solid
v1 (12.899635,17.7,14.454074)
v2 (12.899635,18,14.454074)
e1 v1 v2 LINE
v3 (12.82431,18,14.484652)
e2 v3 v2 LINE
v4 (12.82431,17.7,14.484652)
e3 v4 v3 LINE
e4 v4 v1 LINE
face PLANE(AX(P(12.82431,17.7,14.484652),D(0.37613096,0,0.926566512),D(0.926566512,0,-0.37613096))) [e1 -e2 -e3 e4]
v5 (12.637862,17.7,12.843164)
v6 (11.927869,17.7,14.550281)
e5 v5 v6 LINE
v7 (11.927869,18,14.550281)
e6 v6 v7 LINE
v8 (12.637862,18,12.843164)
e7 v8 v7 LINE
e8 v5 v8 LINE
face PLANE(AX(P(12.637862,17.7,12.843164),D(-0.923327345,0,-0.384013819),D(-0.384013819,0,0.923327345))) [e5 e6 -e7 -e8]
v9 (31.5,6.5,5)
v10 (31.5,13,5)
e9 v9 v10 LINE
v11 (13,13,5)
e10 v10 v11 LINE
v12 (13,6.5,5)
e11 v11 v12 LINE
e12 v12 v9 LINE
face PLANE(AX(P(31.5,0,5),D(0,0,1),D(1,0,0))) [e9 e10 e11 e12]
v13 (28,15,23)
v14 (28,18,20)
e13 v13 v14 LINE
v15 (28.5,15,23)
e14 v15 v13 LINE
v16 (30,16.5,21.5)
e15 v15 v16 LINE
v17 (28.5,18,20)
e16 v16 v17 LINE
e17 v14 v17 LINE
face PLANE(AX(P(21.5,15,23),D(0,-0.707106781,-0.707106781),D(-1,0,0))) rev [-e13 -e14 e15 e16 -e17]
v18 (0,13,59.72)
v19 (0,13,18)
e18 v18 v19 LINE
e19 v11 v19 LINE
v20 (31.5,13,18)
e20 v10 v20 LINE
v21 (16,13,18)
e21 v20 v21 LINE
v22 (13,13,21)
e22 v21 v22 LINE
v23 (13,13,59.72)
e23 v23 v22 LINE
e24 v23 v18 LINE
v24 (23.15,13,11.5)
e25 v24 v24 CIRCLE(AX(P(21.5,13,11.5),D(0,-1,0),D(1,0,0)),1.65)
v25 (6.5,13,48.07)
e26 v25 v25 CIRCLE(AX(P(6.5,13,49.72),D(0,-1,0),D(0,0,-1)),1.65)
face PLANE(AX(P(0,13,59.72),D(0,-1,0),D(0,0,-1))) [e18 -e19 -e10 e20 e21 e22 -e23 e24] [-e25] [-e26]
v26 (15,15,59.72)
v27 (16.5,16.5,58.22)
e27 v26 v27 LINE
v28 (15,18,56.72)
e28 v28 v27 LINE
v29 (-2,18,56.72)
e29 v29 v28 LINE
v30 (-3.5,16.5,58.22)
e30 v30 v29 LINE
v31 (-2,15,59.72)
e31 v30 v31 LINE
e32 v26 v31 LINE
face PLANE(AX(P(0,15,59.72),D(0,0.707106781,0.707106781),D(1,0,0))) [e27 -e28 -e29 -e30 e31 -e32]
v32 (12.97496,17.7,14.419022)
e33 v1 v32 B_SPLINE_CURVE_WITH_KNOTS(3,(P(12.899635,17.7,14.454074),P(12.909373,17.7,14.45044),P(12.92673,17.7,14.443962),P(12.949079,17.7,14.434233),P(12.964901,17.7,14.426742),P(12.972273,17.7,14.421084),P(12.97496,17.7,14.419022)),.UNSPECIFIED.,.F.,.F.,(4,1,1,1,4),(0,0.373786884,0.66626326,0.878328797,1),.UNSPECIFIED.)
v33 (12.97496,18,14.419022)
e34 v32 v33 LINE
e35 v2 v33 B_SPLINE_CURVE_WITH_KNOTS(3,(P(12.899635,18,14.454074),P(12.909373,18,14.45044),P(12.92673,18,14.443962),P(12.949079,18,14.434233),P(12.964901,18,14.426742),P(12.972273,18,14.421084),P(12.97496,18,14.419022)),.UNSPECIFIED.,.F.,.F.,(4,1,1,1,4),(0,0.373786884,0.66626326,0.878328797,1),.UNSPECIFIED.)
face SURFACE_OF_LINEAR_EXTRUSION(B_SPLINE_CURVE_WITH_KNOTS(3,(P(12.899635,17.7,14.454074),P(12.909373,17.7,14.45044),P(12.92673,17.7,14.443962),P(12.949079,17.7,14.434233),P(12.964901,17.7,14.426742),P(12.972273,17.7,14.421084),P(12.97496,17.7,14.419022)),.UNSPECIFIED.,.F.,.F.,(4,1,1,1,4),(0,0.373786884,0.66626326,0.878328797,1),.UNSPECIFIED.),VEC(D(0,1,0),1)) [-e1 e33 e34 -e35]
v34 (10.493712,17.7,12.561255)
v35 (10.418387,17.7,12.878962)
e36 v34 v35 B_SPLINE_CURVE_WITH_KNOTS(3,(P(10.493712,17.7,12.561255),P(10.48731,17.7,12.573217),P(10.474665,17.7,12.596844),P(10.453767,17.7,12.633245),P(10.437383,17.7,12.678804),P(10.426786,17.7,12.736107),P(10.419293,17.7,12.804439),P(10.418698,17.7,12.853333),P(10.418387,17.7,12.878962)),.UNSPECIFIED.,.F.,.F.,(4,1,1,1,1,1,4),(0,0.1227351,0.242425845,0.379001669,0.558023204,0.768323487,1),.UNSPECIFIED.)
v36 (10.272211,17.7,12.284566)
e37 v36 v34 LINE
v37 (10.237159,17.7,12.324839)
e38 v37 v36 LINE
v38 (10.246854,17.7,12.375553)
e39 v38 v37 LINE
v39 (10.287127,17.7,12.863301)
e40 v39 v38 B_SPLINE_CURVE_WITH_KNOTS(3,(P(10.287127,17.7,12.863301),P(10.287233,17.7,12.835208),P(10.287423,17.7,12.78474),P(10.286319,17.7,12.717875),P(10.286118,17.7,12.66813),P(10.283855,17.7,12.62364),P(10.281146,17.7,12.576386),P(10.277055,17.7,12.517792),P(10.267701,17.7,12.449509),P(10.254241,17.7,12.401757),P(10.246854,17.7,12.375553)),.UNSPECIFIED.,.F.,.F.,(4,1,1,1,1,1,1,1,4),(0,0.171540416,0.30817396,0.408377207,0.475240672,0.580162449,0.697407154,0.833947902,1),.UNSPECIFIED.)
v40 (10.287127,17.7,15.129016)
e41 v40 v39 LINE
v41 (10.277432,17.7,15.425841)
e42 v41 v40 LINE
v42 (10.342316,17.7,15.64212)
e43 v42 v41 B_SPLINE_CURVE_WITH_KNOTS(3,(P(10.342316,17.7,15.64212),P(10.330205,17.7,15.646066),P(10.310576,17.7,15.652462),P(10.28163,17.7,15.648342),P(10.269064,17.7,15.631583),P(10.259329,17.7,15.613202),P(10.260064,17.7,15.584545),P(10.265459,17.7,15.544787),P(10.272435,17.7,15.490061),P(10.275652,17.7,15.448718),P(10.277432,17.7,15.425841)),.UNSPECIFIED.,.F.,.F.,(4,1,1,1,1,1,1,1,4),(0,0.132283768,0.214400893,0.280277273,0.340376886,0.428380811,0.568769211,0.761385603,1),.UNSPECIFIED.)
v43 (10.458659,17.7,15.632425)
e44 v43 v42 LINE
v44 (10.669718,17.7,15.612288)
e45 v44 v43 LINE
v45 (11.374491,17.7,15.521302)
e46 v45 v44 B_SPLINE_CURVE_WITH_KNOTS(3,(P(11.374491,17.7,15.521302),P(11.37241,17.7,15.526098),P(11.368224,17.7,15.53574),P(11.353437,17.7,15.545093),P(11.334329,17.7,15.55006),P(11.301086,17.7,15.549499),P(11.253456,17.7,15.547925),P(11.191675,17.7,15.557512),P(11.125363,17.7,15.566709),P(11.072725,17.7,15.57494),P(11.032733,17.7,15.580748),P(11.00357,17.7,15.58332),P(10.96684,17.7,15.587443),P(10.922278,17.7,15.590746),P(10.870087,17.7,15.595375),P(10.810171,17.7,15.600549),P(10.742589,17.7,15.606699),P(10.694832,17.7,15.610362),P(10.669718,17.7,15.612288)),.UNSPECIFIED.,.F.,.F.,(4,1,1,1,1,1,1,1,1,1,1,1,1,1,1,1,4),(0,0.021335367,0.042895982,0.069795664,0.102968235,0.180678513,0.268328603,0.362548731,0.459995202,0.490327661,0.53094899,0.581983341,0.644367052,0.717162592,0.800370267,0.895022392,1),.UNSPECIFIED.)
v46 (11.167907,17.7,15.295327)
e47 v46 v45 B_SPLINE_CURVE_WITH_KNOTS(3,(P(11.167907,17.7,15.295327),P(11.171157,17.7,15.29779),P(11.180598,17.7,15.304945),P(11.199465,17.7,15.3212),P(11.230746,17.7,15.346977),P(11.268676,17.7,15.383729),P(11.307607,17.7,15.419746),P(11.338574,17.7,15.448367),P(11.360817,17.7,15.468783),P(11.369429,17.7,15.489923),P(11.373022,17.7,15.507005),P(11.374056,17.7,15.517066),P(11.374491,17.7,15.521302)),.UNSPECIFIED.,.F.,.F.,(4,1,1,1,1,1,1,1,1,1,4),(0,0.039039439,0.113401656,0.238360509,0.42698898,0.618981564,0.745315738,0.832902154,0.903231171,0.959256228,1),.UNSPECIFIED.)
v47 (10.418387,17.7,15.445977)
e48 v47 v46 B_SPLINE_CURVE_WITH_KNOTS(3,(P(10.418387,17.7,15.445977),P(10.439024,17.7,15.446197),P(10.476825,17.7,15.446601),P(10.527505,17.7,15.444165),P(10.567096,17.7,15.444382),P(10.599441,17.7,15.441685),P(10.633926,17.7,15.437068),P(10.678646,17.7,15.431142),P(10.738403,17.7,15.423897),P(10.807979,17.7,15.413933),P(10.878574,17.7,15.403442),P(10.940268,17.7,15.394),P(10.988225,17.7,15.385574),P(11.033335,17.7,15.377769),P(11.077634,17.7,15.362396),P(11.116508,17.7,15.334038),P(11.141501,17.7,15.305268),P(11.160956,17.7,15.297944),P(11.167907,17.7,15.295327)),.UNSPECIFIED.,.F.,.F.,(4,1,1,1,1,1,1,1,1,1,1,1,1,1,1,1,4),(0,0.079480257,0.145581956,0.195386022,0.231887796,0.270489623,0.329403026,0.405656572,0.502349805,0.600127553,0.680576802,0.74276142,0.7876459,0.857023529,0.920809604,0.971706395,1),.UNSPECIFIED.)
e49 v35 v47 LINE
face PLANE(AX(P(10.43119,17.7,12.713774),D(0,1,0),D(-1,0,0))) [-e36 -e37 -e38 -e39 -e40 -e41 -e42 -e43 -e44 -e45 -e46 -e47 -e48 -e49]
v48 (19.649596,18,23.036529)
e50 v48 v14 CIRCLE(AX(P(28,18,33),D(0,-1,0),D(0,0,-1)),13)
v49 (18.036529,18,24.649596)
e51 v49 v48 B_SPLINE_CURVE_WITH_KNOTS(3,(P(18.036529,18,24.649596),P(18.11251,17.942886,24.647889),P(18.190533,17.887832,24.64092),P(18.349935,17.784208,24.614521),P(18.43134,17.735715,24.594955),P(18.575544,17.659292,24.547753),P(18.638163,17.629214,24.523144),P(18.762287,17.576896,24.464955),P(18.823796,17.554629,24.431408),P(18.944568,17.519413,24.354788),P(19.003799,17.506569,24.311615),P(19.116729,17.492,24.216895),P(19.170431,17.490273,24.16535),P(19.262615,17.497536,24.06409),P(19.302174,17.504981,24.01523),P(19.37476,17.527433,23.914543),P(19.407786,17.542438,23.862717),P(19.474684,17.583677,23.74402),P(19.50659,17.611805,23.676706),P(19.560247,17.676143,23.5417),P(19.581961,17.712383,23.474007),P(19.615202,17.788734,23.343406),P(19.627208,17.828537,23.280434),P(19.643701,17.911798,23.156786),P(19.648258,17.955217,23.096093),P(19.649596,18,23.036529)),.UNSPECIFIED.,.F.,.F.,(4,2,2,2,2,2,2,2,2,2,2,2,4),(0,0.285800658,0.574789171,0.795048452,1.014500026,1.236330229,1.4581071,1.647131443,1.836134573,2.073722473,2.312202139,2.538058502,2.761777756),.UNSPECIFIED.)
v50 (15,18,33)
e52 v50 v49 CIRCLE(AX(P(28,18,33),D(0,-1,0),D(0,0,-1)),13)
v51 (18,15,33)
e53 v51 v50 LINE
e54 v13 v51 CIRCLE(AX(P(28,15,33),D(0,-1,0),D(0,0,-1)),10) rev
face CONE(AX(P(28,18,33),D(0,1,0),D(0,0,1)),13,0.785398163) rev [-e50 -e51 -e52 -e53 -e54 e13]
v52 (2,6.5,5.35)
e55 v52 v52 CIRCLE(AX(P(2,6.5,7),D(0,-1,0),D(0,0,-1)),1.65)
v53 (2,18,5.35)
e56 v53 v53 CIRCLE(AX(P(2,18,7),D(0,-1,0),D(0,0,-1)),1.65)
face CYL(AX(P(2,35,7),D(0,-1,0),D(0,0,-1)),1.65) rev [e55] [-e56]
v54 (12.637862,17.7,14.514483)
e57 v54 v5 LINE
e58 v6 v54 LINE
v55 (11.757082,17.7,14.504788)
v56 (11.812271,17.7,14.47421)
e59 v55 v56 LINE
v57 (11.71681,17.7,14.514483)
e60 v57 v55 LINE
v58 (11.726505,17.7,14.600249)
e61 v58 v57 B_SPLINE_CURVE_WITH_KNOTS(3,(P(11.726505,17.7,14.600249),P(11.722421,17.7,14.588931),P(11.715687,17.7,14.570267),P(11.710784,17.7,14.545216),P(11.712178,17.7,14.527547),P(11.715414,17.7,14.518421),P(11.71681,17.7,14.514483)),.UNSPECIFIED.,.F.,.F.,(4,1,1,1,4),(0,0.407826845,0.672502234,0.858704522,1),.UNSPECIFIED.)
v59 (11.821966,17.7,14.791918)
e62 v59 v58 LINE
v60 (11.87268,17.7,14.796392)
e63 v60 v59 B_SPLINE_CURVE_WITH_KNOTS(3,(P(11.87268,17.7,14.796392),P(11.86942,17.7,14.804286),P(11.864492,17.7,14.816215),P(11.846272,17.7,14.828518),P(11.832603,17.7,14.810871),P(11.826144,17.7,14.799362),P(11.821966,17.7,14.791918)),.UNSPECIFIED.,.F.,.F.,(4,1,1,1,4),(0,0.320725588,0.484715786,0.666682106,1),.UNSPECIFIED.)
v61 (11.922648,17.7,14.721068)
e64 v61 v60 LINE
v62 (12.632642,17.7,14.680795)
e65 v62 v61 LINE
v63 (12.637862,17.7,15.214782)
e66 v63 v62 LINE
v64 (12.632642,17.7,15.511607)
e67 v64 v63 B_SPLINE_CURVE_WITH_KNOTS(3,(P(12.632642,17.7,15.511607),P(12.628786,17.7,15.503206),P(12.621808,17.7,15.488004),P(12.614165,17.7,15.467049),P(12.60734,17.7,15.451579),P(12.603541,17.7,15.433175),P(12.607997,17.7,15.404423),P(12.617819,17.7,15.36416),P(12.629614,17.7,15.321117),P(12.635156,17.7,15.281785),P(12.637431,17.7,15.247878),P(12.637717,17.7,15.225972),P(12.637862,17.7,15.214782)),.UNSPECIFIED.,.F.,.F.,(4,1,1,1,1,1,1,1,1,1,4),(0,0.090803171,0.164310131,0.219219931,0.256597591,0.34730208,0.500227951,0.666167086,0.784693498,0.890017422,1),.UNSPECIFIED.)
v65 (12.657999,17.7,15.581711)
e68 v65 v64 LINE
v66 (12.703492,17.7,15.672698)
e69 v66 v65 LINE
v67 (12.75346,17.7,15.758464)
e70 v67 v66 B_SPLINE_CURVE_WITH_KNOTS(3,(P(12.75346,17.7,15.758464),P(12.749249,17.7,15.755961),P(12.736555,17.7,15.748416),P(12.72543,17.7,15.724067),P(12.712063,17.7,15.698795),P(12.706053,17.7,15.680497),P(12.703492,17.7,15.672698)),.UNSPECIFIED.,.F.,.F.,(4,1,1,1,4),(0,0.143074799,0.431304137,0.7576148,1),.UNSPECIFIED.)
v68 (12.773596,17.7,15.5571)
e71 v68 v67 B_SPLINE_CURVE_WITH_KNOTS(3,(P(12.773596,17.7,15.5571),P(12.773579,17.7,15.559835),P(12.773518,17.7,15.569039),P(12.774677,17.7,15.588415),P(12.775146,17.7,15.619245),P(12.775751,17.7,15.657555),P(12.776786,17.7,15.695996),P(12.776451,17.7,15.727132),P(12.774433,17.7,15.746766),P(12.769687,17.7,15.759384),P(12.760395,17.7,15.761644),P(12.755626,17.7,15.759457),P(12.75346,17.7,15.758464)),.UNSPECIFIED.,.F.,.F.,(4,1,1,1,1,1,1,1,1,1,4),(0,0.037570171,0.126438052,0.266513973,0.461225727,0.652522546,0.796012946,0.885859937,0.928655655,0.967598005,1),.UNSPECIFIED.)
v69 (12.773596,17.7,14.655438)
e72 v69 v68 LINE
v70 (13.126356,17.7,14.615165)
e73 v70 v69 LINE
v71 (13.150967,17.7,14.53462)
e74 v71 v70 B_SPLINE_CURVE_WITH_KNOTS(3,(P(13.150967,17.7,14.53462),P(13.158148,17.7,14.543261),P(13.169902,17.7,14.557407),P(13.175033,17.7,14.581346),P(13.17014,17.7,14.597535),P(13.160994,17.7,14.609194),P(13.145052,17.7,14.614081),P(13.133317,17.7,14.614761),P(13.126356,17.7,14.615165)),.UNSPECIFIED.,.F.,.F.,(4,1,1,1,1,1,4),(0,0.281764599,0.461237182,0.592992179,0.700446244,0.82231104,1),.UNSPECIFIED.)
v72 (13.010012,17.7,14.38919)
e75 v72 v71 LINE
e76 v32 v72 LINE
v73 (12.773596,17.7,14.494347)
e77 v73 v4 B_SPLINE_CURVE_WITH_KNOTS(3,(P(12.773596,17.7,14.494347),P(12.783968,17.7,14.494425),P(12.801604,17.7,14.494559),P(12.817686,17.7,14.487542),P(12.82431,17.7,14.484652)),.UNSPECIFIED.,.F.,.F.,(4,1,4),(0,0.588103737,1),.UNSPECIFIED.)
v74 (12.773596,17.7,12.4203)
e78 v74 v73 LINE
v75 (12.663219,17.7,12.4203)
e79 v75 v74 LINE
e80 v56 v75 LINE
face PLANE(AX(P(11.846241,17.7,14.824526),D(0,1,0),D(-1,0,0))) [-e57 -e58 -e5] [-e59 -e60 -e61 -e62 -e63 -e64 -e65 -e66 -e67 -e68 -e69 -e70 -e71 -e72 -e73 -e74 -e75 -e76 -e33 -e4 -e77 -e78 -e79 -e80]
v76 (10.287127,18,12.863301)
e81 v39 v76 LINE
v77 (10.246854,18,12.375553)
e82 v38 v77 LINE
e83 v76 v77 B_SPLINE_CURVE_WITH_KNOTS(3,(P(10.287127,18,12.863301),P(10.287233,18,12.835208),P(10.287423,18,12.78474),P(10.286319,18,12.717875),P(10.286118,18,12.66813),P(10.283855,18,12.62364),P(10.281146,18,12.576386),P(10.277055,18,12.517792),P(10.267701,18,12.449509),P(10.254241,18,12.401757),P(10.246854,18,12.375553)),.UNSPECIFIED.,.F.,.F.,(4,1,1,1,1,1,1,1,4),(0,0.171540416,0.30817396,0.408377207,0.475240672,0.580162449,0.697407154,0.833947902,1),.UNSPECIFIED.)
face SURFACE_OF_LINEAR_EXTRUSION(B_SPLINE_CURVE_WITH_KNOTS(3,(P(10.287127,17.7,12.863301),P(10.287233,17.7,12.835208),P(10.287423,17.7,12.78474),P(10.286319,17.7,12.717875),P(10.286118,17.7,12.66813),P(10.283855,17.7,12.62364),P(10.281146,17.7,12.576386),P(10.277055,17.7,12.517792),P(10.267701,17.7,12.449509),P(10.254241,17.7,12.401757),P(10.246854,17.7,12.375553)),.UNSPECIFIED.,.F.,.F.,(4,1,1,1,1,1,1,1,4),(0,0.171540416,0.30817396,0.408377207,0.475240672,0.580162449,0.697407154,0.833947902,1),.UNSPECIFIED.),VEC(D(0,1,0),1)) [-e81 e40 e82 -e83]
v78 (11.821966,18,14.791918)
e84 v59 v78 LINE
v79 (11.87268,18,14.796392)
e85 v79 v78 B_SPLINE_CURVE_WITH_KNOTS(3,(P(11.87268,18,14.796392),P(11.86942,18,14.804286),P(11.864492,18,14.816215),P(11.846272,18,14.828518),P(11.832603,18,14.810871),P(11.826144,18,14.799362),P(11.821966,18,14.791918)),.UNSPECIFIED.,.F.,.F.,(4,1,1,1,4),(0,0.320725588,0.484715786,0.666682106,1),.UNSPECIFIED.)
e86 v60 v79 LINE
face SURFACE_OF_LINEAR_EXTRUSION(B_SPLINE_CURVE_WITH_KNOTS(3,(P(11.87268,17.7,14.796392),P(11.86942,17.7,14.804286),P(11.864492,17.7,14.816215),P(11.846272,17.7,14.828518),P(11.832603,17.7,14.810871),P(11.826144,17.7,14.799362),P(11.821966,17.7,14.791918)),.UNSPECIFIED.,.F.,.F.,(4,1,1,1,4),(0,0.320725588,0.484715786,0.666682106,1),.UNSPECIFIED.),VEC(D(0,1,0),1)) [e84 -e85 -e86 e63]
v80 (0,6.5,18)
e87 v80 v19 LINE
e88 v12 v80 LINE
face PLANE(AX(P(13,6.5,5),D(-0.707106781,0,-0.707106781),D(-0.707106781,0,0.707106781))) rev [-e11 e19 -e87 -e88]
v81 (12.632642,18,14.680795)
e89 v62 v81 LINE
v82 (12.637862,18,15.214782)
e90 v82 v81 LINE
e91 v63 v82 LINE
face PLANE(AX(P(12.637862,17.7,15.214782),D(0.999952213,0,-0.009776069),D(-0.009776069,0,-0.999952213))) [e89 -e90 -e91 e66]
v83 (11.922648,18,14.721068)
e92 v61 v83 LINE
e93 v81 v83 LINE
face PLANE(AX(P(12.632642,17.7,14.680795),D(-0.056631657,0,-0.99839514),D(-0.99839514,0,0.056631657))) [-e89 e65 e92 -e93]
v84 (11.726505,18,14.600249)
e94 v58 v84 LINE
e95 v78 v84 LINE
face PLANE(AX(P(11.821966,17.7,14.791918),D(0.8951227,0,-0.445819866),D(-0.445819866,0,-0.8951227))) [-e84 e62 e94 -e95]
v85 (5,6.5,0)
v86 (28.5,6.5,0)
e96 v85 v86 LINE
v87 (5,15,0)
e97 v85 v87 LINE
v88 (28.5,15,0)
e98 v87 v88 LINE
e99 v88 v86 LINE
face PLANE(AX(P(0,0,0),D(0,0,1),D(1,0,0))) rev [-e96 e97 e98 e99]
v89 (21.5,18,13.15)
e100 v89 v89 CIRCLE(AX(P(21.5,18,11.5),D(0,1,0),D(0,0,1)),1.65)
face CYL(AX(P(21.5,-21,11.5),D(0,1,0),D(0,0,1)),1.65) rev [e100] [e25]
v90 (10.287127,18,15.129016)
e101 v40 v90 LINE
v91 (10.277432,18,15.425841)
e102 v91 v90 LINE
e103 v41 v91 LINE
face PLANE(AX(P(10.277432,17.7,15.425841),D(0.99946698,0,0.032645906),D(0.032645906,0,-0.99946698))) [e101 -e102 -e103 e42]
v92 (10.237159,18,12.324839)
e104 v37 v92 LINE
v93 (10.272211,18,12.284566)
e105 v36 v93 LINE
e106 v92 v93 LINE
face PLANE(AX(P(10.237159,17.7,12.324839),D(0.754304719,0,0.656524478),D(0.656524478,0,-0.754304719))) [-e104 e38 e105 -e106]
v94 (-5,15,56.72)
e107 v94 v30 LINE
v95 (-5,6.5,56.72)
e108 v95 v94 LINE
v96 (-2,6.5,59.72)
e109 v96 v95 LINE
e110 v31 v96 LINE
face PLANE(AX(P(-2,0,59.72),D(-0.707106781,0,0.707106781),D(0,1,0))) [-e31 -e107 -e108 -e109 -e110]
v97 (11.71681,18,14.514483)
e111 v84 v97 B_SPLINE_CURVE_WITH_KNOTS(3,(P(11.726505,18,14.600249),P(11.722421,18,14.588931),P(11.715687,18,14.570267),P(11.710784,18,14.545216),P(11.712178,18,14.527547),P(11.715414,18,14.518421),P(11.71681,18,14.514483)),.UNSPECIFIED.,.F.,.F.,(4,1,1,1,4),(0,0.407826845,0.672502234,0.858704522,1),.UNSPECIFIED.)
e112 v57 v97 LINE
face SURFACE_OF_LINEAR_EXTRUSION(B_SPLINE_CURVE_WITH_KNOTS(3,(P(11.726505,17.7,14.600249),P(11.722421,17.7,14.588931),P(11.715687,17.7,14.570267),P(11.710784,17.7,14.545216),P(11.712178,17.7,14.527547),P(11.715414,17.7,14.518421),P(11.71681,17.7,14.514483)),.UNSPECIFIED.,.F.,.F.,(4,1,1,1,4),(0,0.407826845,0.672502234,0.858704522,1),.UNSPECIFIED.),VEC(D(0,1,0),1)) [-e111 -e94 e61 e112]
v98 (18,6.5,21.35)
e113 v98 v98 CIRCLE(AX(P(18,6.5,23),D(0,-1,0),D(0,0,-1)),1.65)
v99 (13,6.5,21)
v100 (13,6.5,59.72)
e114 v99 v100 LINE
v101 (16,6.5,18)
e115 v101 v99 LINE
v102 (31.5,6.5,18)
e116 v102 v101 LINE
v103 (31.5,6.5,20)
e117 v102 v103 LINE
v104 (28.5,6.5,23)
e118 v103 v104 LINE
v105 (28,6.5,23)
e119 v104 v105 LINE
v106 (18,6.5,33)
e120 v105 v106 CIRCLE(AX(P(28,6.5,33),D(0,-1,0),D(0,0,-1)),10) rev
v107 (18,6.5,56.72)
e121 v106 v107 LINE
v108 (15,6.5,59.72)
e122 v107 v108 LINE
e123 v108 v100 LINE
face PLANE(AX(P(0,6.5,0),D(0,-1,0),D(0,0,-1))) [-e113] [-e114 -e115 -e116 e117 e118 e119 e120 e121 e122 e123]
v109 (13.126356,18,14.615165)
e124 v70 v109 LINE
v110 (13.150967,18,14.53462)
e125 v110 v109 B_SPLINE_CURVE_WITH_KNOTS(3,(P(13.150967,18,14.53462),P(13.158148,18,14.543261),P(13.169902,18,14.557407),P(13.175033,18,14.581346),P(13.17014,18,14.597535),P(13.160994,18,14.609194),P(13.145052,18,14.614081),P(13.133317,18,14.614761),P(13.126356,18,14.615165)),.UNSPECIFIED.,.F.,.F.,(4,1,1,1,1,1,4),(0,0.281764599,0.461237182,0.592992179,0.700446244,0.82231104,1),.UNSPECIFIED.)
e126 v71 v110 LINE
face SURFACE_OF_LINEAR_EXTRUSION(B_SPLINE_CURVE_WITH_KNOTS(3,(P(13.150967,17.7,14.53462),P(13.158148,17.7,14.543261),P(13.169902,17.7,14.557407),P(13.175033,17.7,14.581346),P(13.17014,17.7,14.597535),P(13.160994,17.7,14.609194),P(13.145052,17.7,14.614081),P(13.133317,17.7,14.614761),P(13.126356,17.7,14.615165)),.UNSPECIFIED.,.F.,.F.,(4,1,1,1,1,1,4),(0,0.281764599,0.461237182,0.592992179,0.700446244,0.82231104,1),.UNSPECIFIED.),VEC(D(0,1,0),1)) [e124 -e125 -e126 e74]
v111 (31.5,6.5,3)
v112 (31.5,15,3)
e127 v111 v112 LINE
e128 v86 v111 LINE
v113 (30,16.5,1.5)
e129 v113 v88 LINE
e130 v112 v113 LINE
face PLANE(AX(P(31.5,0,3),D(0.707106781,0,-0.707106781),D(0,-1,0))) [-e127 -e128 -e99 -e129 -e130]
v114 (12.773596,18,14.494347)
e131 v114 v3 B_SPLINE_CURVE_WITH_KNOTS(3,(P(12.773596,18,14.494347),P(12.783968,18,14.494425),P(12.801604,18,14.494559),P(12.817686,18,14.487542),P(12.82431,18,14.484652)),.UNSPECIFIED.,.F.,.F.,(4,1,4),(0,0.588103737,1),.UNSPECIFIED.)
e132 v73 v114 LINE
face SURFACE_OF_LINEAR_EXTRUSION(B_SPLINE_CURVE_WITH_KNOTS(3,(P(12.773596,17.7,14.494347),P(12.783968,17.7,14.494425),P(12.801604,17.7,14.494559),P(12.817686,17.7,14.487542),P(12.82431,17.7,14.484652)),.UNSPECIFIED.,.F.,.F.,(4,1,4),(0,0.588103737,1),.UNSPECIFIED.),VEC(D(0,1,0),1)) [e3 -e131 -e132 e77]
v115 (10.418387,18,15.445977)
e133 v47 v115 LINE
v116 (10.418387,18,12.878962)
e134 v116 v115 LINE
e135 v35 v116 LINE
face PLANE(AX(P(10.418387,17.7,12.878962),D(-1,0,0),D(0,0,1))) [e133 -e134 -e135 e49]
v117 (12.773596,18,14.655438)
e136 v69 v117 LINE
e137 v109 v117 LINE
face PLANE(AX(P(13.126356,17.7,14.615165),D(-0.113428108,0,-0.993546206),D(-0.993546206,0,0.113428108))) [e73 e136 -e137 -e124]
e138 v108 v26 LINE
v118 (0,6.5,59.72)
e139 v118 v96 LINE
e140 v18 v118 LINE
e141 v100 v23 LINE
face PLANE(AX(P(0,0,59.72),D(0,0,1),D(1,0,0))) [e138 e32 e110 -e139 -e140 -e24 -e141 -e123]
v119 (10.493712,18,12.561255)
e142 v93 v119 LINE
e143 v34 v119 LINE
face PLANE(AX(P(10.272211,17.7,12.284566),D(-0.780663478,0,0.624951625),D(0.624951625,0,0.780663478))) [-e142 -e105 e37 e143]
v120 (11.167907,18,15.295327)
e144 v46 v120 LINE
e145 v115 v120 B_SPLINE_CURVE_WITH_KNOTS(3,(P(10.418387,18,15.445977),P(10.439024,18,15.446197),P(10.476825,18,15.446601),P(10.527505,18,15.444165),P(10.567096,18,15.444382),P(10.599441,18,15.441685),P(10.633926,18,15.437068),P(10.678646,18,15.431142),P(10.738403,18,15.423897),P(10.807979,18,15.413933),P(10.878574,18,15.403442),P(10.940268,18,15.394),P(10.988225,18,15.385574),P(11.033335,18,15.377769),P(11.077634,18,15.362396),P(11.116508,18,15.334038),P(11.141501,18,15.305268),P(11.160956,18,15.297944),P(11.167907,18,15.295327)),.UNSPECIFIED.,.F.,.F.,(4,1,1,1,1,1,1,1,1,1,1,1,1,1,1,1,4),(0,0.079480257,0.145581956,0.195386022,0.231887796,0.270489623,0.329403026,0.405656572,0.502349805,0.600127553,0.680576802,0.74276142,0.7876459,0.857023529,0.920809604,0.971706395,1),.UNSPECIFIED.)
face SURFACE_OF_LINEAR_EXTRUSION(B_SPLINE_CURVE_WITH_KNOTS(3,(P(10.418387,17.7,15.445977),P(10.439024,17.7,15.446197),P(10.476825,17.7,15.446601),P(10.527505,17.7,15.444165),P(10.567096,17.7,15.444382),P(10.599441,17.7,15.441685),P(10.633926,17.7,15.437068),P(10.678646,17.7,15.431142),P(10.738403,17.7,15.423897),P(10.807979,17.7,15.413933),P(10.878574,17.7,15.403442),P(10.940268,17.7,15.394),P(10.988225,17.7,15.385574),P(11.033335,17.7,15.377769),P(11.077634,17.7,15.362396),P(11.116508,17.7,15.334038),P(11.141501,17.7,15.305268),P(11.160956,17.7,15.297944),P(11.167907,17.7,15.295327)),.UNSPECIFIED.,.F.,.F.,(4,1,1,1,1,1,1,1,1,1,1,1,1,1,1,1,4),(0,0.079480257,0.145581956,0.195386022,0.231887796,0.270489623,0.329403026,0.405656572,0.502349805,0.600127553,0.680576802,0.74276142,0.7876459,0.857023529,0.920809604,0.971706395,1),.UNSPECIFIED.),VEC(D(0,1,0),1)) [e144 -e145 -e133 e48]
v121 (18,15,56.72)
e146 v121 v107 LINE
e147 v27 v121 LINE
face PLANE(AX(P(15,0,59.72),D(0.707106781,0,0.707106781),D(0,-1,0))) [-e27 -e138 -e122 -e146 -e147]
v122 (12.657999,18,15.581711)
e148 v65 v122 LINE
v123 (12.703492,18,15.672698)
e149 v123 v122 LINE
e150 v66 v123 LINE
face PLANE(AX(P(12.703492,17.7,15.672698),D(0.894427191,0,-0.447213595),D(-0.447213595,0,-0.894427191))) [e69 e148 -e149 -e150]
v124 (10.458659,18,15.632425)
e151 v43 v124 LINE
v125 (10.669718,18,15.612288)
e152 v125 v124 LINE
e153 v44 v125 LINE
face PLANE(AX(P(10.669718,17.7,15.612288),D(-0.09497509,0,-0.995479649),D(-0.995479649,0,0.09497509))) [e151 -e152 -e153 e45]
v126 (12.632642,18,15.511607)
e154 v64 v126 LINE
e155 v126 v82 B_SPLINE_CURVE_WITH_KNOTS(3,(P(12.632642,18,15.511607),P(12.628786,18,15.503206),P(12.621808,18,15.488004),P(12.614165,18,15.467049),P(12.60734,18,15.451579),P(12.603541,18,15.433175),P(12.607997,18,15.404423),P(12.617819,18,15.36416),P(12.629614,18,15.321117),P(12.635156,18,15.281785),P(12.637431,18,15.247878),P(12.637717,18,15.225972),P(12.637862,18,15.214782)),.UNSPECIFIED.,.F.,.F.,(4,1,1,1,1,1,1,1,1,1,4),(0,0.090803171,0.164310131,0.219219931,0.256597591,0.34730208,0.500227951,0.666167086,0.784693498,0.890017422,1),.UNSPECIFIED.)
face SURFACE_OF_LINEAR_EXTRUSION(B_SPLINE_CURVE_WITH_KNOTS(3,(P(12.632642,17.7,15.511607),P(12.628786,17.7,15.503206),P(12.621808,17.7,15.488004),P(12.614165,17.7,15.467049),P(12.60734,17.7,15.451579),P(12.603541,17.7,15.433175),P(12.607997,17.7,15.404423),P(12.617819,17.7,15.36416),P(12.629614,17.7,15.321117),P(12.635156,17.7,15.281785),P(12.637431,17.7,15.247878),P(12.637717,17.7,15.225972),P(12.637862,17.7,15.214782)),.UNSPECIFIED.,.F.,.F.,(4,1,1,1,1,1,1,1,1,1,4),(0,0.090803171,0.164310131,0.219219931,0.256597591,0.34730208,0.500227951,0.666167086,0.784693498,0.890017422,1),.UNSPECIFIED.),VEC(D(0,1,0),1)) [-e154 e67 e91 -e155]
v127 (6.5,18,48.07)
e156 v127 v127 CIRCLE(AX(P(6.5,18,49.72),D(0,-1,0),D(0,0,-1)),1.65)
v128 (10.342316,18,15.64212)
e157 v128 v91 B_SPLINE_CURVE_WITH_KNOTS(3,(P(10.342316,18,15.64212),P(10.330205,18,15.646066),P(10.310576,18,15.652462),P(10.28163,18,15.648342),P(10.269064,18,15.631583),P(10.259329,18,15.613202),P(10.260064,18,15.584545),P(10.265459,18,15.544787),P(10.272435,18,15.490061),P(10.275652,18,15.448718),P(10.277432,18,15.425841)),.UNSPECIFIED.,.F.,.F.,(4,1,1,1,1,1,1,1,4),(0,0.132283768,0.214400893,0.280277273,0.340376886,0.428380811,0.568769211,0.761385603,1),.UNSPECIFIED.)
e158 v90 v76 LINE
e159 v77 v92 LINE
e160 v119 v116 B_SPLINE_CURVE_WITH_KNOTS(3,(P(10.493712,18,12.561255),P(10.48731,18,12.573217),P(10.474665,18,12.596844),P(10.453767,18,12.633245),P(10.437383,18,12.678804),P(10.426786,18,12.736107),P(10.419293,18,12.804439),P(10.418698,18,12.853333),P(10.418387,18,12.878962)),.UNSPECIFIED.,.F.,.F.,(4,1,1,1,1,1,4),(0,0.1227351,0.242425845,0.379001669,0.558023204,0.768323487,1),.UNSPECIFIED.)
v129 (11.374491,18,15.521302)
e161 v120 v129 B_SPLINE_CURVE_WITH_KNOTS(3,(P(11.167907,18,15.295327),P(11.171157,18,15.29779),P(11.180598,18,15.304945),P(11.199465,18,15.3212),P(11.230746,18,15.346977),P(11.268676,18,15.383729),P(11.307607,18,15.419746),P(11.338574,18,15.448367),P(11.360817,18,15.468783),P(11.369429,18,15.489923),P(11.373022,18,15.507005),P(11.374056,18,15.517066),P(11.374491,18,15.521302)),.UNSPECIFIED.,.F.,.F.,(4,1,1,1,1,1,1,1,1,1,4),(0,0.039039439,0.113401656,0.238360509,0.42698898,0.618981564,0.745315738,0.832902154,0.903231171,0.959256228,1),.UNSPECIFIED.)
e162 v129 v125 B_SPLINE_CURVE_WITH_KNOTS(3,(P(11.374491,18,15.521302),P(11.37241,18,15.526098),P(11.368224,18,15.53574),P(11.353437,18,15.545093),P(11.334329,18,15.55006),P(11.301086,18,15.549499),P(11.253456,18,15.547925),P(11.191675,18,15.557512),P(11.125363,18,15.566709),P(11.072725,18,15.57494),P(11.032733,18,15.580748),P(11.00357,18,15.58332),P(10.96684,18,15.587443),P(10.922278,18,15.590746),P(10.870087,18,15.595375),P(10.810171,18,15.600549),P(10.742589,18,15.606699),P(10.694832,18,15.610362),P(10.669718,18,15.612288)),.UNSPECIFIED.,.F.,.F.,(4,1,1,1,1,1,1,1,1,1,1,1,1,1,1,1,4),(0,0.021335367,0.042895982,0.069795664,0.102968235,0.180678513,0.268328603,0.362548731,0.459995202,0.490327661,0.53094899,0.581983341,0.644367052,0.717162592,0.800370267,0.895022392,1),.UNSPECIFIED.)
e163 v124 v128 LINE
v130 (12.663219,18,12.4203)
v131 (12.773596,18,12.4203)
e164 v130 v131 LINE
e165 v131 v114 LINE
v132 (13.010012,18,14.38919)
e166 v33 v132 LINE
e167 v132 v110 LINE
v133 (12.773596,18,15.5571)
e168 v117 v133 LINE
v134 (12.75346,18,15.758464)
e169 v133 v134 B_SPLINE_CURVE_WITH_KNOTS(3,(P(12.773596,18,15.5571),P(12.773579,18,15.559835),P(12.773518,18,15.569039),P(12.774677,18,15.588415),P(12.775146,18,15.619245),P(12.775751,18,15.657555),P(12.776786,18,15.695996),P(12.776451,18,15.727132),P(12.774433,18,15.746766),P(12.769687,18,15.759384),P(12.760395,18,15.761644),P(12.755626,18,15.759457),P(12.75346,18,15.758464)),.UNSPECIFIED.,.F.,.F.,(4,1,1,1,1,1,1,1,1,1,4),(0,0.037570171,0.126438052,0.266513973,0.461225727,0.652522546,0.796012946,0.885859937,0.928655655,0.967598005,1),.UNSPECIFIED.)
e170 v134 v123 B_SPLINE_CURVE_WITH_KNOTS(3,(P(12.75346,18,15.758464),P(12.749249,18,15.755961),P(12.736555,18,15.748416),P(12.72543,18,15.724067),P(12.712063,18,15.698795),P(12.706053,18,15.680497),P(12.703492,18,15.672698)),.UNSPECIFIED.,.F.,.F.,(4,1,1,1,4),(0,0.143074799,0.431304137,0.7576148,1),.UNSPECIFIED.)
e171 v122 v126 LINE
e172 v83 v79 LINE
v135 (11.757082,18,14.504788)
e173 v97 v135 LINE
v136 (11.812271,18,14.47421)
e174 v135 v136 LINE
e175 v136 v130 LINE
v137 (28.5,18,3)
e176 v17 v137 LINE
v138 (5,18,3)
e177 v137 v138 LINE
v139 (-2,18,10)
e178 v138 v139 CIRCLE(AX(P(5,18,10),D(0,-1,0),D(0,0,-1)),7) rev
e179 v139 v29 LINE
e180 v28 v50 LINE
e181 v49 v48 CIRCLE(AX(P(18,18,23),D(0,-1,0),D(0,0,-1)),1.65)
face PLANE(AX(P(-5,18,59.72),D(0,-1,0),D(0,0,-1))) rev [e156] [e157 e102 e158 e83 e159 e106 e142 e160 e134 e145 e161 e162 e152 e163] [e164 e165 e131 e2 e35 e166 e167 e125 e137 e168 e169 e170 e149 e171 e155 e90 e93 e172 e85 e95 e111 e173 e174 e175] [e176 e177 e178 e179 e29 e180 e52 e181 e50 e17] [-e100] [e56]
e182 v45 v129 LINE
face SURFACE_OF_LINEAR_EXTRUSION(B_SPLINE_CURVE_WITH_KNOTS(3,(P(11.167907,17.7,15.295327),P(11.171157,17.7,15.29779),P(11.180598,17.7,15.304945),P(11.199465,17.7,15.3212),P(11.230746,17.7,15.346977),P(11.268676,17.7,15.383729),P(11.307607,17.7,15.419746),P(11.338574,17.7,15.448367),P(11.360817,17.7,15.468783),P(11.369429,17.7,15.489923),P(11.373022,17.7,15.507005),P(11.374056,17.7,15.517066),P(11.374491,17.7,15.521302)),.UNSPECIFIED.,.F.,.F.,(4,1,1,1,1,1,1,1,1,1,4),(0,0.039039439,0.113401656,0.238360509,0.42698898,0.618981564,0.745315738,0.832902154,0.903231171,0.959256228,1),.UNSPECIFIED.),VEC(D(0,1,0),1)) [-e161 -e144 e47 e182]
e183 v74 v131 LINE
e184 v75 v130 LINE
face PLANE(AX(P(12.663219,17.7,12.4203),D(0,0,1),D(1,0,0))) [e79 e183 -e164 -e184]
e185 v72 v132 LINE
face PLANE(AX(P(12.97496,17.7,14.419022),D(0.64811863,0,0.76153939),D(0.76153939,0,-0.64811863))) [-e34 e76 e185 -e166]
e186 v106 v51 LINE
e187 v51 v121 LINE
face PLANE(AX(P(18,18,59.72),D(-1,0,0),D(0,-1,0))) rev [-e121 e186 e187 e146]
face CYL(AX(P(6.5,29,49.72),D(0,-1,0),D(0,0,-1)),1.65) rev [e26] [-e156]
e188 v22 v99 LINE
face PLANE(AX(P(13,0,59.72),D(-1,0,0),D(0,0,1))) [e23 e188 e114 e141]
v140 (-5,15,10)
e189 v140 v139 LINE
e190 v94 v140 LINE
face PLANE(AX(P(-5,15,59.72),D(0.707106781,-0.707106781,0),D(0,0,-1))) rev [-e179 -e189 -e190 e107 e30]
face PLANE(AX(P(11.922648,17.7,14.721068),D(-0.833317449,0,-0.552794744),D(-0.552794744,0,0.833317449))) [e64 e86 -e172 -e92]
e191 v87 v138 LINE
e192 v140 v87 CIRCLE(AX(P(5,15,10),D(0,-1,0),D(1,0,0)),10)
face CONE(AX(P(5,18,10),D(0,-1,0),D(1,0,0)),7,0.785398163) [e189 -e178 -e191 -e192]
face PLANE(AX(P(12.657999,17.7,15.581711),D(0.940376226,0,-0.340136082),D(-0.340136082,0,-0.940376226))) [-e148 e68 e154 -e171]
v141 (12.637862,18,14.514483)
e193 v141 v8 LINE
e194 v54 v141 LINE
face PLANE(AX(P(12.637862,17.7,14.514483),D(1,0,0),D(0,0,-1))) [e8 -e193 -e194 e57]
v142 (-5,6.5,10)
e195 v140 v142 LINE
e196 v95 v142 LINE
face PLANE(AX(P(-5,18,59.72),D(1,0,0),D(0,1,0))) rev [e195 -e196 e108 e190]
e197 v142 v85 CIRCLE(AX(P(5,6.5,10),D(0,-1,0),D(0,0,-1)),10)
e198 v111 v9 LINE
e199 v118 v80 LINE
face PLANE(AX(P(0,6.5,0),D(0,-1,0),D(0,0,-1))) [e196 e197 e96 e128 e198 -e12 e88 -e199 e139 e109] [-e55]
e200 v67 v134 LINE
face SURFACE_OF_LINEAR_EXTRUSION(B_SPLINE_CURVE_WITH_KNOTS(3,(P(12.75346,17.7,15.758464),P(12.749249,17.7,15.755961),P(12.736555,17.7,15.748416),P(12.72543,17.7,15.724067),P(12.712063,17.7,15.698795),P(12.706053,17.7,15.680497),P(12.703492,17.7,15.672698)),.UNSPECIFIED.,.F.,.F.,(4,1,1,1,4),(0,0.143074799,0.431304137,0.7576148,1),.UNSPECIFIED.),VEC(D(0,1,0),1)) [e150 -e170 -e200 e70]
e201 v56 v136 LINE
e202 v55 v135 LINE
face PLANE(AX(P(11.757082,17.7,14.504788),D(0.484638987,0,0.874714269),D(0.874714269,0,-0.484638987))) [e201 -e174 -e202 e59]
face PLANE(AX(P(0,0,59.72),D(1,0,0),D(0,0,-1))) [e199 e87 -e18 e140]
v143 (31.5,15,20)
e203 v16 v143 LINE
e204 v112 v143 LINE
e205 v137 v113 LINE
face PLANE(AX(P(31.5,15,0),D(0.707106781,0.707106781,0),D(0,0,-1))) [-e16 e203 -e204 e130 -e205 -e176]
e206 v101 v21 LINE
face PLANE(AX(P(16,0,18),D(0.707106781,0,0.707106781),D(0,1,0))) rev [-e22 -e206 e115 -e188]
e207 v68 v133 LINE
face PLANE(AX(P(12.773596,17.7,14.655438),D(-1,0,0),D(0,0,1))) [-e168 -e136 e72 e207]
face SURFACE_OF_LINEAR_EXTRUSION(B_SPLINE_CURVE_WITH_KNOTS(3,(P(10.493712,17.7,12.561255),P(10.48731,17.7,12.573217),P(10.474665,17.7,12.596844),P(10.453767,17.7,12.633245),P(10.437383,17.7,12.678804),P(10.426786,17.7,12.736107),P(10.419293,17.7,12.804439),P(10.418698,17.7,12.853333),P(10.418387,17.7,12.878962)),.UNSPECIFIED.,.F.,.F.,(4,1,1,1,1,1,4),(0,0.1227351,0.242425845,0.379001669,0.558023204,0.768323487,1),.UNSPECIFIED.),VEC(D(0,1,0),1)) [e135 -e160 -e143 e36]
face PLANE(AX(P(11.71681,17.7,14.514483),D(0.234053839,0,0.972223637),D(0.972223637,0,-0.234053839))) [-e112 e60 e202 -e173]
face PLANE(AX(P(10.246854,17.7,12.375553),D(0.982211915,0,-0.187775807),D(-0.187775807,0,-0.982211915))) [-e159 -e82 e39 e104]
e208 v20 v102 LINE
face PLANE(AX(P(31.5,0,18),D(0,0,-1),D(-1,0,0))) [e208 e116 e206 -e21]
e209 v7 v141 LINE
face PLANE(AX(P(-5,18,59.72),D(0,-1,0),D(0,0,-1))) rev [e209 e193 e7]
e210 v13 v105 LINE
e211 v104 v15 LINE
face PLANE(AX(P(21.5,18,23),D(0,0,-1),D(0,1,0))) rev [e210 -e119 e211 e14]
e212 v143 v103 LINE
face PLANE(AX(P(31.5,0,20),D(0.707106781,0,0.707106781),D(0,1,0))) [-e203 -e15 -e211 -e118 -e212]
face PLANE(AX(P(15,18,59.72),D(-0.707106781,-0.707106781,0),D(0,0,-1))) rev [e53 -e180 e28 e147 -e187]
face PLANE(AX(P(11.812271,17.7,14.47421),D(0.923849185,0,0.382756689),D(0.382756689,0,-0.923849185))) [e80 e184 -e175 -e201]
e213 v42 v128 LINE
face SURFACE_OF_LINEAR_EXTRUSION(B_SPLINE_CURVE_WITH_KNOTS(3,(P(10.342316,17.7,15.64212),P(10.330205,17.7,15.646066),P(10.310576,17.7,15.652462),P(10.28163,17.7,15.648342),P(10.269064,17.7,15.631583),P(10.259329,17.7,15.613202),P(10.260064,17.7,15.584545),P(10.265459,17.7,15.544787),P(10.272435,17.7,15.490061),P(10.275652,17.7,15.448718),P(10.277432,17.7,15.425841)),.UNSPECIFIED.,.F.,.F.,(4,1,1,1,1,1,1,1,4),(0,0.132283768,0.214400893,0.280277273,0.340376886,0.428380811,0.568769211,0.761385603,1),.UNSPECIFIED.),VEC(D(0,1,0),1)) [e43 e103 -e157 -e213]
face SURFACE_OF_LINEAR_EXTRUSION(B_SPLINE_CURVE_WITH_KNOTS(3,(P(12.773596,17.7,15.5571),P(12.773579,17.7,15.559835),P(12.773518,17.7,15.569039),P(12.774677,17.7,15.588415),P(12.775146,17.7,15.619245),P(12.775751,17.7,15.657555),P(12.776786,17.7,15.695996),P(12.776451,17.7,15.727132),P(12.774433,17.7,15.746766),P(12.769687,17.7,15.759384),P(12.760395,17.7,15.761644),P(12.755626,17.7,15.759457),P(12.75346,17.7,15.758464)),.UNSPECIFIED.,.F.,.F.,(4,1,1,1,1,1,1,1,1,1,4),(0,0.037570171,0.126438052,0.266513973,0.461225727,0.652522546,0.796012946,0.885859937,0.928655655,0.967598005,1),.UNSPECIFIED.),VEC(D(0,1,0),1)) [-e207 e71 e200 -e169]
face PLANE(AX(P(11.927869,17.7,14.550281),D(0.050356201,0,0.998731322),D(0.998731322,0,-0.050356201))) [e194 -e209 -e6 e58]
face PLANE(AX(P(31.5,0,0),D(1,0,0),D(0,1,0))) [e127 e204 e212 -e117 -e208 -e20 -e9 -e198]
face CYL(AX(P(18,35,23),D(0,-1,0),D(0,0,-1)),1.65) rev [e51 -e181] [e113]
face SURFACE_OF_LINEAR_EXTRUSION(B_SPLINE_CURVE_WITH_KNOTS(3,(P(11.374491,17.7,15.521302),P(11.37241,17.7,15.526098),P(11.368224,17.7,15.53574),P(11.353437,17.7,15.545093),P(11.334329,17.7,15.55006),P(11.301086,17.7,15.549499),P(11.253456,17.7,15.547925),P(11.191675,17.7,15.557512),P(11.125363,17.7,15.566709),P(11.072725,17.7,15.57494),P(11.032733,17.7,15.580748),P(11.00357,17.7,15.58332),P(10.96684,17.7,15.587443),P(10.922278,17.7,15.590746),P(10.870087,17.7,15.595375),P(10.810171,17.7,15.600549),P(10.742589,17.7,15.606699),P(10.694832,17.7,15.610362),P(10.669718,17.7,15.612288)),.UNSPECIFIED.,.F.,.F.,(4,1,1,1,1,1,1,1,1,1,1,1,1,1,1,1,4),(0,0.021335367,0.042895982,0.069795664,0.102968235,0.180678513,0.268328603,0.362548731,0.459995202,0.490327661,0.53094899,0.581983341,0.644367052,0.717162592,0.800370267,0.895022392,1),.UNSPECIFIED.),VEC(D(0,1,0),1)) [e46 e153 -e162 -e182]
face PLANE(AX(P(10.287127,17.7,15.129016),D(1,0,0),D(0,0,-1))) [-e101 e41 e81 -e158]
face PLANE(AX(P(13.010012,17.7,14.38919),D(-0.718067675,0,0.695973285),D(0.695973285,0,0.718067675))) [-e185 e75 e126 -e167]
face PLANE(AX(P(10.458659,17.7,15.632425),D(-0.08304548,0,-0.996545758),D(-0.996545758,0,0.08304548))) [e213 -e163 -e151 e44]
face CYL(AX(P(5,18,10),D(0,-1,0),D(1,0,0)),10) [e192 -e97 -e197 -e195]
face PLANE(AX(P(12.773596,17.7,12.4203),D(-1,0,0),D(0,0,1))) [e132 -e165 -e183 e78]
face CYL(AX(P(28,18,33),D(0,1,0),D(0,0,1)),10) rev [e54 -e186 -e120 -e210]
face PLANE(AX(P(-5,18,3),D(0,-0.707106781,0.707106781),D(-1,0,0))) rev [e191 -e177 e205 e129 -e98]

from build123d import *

# Parameters (mm, degrees)
SKETCH_1_W          = 23
SKETCH_1_H          = 23
SKETCH_1_W_2        = 13
SKETCH_1_H_2        = 13
EXTRUDE_1_DEPTH     = 59.72
SKETCH_2_R          = 1.65
CUT_EXTRUDE_1_DEPTH = 34
SKETCH_4_W          = 23
SKETCH_4_H          = 23
SKETCH_4_R          = 3
EXTRUDE_2_DEPTH     = 3.5
SKETCH_5_W          = 23
SKETCH_5_H          = 23
SKETCH_5_W_2        = 13
SKETCH_5_H_2        = 13
EXTRUDE_1_2_DEPTH   = 10
SKETCH_6_R          = 1.65
CUT_EXTRUDE_2_DEPTH = 39
SKETCH_7_W          = 13
SKETCH_7_H          = 13
CUT_EXTRUDE_3_DEPTH = 13
CHAMFER_1_SIZE      = 3
SKETCH_8_W          = 36.5
SKETCH_8_H          = 59.72
CUT_EXTRUDE_4_DEPTH = 11.5
EXTRUDE_3_DEPTH     = 6.5
FILLET_1_R          = 10
FILLET_2_R          = 10
SKETCH_10_R         = 1.65
CUT_EXTRUDE_5_DEPTH = 28.5
CHAMFER_3_SIZE      = 3
CHAMFER_4_SIZE      = 3
CHAMFER_5_SIZE      = 3
CUT_EXTRUDE_6_DEPTH = 0.3


with BuildPart() as part:
    # 草图1 → Extrude 1 (new body)
    with BuildSketch(Plane.XY):
        with Locations((6.5, 6.5)):
            Rectangle(SKETCH_1_W, SKETCH_1_H)
        with Locations((6.5, 6.5)):
            Rectangle(SKETCH_1_W_2, SKETCH_1_H_2, mode=Mode.SUBTRACT)
    extrude(amount=EXTRUDE_1_DEPTH)

    # 草图2 → 切除-拉伸1 (cut)
    with BuildSketch(Plane.XZ.offset(5)):
        with Locations(Location((6.5, 49.72, 0), (0, 0, 270))):
            Circle(SKETCH_2_R)
    extrude(amount=-CUT_EXTRUDE_1_DEPTH, mode=Mode.SUBTRACT)

    # 草图4 → 凸台-拉伸2 (add)
    with BuildSketch(Plane(origin=(18, 0, 0), x_dir=(0, 0, -1), z_dir=(1, 0, 0))):
        with Locations((-11.5, 6.5)):
            Rectangle(SKETCH_4_W, SKETCH_4_H)
        with Locations(Location((-11.5, 6.5, 0), (0, 0, 90))):
            Circle(SKETCH_4_R, mode=Mode.SUBTRACT)
    extrude(amount=EXTRUDE_2_DEPTH)

    # 草图5 → Extrude 1 2 (add)
    with BuildSketch(Plane(origin=(21.5, 0, 0), x_dir=(0, 0, -1), z_dir=(1, 0, 0))):
        with Locations((-11.5, 6.5)):
            Rectangle(SKETCH_5_W, SKETCH_5_H)
        with Locations((-11.5, 6.5)):
            Rectangle(SKETCH_5_W_2, SKETCH_5_H_2, mode=Mode.SUBTRACT)
    extrude(amount=EXTRUDE_1_2_DEPTH)

    # 草图6 → 切除-拉伸2 (cut)
    with BuildSketch(Plane(origin=(0, 18, 0), x_dir=(1, 0, 0), z_dir=(0, 1, 0))):
        with Locations(Location((21.5, -11.5, 0), (0, 0, 270))):
            Circle(SKETCH_6_R)
    extrude(amount=-CUT_EXTRUDE_2_DEPTH, mode=Mode.SUBTRACT)

    # 草图7 → 切除-拉伸3 (cut)
    with BuildSketch(Plane(origin=(21.5, 0, 0), x_dir=(0, 0, -1), z_dir=(1, 0, 0))):
        with Locations((-11.5, 6.5)):
            Rectangle(SKETCH_7_W, SKETCH_7_H)
    extrude(amount=-CUT_EXTRUDE_3_DEPTH, mode=Mode.SUBTRACT)

    # 倒角1
    chamfer_1_edges = [part.edges().sort_by_distance(p)[0] for p in [
        (13, 6.5, 18),
    ]]
    chamfer(chamfer_1_edges, length=CHAMFER_1_SIZE)

    # 草图8 → 切除-拉伸4 (cut)
    with BuildSketch(Plane.XZ.offset(5)):
        with Locations((13.25, 29.86)):
            Rectangle(SKETCH_8_W, SKETCH_8_H)
    extrude(amount=-CUT_EXTRUDE_4_DEPTH, mode=Mode.SUBTRACT)

    # 草图9 → 凸台-拉伸3 (add)
    with BuildSketch(Plane.XZ.offset(-13)):
        Polygon((13, 5), (0, 18), (0, 0), (13, 0), align=None)
    extrude(amount=EXTRUDE_3_DEPTH)

    # 圆角1
    fillet_1_edges = [part.edges().sort_by_distance(p)[0] for p in [
        (-5, 12.25, 0),
    ]]
    fillet(fillet_1_edges, radius=FILLET_1_R)

    # 圆角2
    fillet_2_edges = [part.edges().sort_by_distance(p)[0] for p in [
        (18, 12.25, 23),
    ]]
    fillet(fillet_2_edges, radius=FILLET_2_R)

    # 草图10 → 切除-拉伸5 (cut)
    with BuildSketch(Plane.XZ.offset(-6.5)):
        with Locations(Location((2, 7, 0), (0, 0, 270))):
            Circle(SKETCH_10_R)
        with Locations(Location((18, 23, 0), (0, 0, 270))):
            Circle(SKETCH_10_R)
    extrude(amount=-CUT_EXTRUDE_5_DEPTH, mode=Mode.SUBTRACT)

    # 倒角3
    # the kernel refuses this chamfer: 3 mm, written as the material it takes off along each edge
    with BuildSketch(Plane(origin=(5, 18, 10), x_dir=(0, 0, -1), z_dir=(1, 0, 0))) as chamfer_3_piece_1:
        Polygon((10 - CHAMFER_3_SIZE, 0), (10, -CHAMFER_3_SIZE), (10, 0), align=None)
    revolve(axis=Axis((5, 18, 10), (0, 1, 0)), revolution_arc=90, mode=Mode.SUBTRACT)
    with BuildSketch(Plane(origin=(28, 18, 33), x_dir=(-1, 0, 0), z_dir=(0, 0, 1))) as chamfer_3_piece_2:
        Polygon((10 + CHAMFER_3_SIZE, 0), (10, CHAMFER_3_SIZE), (10, 0), align=None)
    revolve(axis=Axis((28, 18, 33), (0, -1, 0)), revolution_arc=90, mode=Mode.SUBTRACT)
    with BuildSketch(Plane(origin=(28, 18, 23), x_dir=(0, 0.027495876610586768, -0.9996219169112968), z_dir=(1, 0, 0))) as chamfer_3_piece_3:
        Polygon((CHAMFER_3_SIZE * 0.999621916911, -CHAMFER_3_SIZE * 0.0274958766106), (-CHAMFER_3_SIZE * 0.0274958766106, -CHAMFER_3_SIZE * 0.999621916911), (0, 0), align=None)
    extrude(amount=11.215048964, mode=Mode.SUBTRACT)
    with BuildSketch(Plane(origin=(39.215048964, 18, 0), x_dir=(0, 0.027495876610586778, 0.9996219169112968), z_dir=(-1, 0, 0))) as chamfer_3_piece_4:
        Polygon((CHAMFER_3_SIZE * 0.999621916911, -CHAMFER_3_SIZE * 0.0274958766106), (-CHAMFER_3_SIZE * 0.0274958766106, -CHAMFER_3_SIZE * 0.999621916911), (0, 0), align=None)
    extrude(amount=34.215048964, mode=Mode.SUBTRACT)
    with BuildSketch(Plane(origin=(-5, 18, 10), x_dir=(0.9996219169112968, 0.027495876610586778, 0), z_dir=(0, 0, 1))) as chamfer_3_piece_5:
        Polygon((CHAMFER_3_SIZE * 0.999621916911, -CHAMFER_3_SIZE * 0.0274958766106), (-CHAMFER_3_SIZE * 0.0274958766106, -CHAMFER_3_SIZE * 0.999621916911), (0, 0), align=None)
    extrude(amount=57.435048964, mode=Mode.SUBTRACT)
    with BuildSketch(Plane(origin=(18, 18, 33), x_dir=(-0.9996219169112968, 0.02749587661058678, 0), z_dir=(0, 0, 1))) as chamfer_3_piece_6:
        Polygon((CHAMFER_3_SIZE * 0.999621916911, CHAMFER_3_SIZE * 0.0274958766106), (-CHAMFER_3_SIZE * 0.0274958766106, CHAMFER_3_SIZE * 0.999621916911), (0, 0), align=None)
    extrude(amount=34.435048964, mode=Mode.SUBTRACT)

    # 倒角4
    chamfer_4_edges = [part.edges().sort_by_distance(p)[0] for p in [
        (31.5, 18, 11.5),
        (6.5, 18, 59.72),
    ]]
    chamfer(chamfer_4_edges, length=CHAMFER_4_SIZE)

    # 倒角5
    chamfer_5_edges = [part.edges().sort_by_distance(p)[0] for p in [
        (31.5, 10.75, 0),
        (18, 10.75, 59.72),
        (-5, 10.75, 59.72),
        (31.5, 10.75, 23),
    ]]
    chamfer(chamfer_5_edges, length=CHAMFER_5_SIZE)

    # 草图11 → 切除-拉伸6 (cut)
    # profile 1 of 2: a face of its own
    with BuildSketch(Plane(origin=(0, 18, 0), x_dir=(1, 0, 0), z_dir=(0, 1, 0))):
        with BuildLine():
            Line((10.237159209, -12.32483908), (10.272211414, -12.284566333))
            Line((10.272211414, -12.284566333), (10.493711521, -12.561255018))
            add(Edge.make_bspline(
                [(10.493711521, -12.561255018), (10.487309741, -12.57321708), (10.474664974, -12.596844492), (10.453766643, -12.633245036), (10.437383484, -12.678803736), (10.42678589, -12.736107023), (10.41929345, -12.804438747), (10.418698455, -12.853332822), (10.418386569, -12.878962242)],
                knots=[0, 0, 0, 0, 0.736410598, 1.454555069, 2.274010016, 3.348139226, 4.609940921, 6, 6, 6, 6], degree=3))
            Line((10.418386569, -12.878962242), (10.418386569, -15.445976945))
            add(Edge.make_bspline(
                [(10.418386569, -15.445976945), (10.439024116, -15.446197463), (10.476825383, -15.44660138), (10.527504836, -15.444164634), (10.567096144, -15.444382267), (10.599440912, -15.441684851), (10.633925707, -15.437068289), (10.678646108, -15.43114223), (10.738403056, -15.423897132), (10.807978822, -15.413933144), (10.878573878, -15.403442161), (10.940268165, -15.393999697), (10.988224608, -15.385574298), (11.03333546, -15.377768735), (11.077634294, -15.362395951), (11.116507962, -15.334038018), (11.141501488, -15.3052678), (11.160956228, -15.297943801), (11.167907131, -15.29532704)],
                knots=[0, 0, 0, 0, 1.271684107, 2.329311289, 3.126176351, 3.710204741, 4.32783396, 5.270448411, 6.49050515, 8.03759688, 9.602040843, 10.889228832, 11.884182716, 12.602334394, 13.712376462, 14.732953672, 15.547302315, 16, 16, 16, 16], degree=3))
            add(Edge.make_bspline(
                [(11.167907131, -15.29532704), (11.171157256, -15.297790165), (11.180598208, -15.304945044), (11.199465358, -15.321199607), (11.23074612, -15.346977294), (11.268675777, -15.383728766), (11.307606698, -15.419746285), (11.338574425, -15.448367363), (11.360816593, -15.468783286), (11.369429212, -15.489923279), (11.373022107, -15.507004685), (11.374056065, -15.517065759), (11.374491406, -15.521301897)],
                knots=[0, 0, 0, 0, 0.390394386, 1.134016561, 2.38360509, 4.269889804, 6.18981564, 7.453157385, 8.329021544, 9.032311711, 9.592562279, 10, 10, 10, 10], degree=3))
            add(Edge.make_bspline(
                [(11.374491406, -15.521301897), (11.37240974, -15.526097769), (11.368224433, -15.535740147), (11.353436868, -15.545092844), (11.334328563, -15.550059783), (11.301085761, -15.549499), (11.253456452, -15.547924897), (11.1916752, -15.557511576), (11.12536294, -15.566709384), (11.072725012, -15.574940209), (11.032733497, -15.580748142), (11.003569508, -15.583319798), (10.966840315, -15.587442615), (10.922278163, -15.590745604), (10.870087153, -15.595374751), (10.810170985, -15.600549317), (10.742588839, -15.606698877), (10.694831886, -15.610362116), (10.669718339, -15.612288472)],
                knots=[0, 0, 0, 0, 0.341365878, 0.68633572, 1.116730632, 1.647491765, 2.890856209, 4.29325764, 5.800779701, 7.359923239, 7.845242571, 8.495183841, 9.311733456, 10.309872826, 11.474601469, 12.805924266, 14.320358265, 16, 16, 16, 16], degree=3))
            Line((10.669718339, -15.612288472), (10.458659315, -15.632424846))
            Line((10.458659315, -15.632424846), (10.342315825, -15.642120137))
            add(Edge.make_bspline(
                [(10.342315825, -15.642120137), (10.330205012, -15.646066226), (10.310576231, -15.652461909), (10.28162952, -15.648341606), (10.269064193, -15.631583459), (10.259329157, -15.613202207), (10.260064065, -15.584545017), (10.265458776, -15.544786876), (10.272435293, -15.490061402), (10.275652028, -15.448717521), (10.277431955, -15.425840571)],
                knots=[0, 0, 0, 0, 1.058270145, 1.715207142, 2.242218181, 2.723015089, 3.427046488, 4.550153686, 6.091084828, 8, 8, 8, 8], degree=3))
            Line((10.277431955, -15.425840571), (10.287127246, -15.129015513))
            Line((10.287127246, -15.129015513), (10.287127246, -12.863300618))
            add(Edge.make_bspline(
                [(10.287127246, -12.863300618), (10.287232845, -12.835208092), (10.287422554, -12.784739607), (10.286319057, -12.717874585), (10.286118094, -12.668130177), (10.283854663, -12.623640485), (10.281146263, -12.576386479), (10.277055063, -12.517791845), (10.267701437, -12.449509467), (10.254241067, -12.401757484), (10.2468545, -12.375552909)],
                knots=[0, 0, 0, 0, 1.372323329, 2.465391677, 3.267017655, 3.801925377, 4.641299591, 5.579257235, 6.671583216, 8, 8, 8, 8], degree=3))
            Line((10.2468545, -12.375552909), (10.237159209, -12.32483908))
        make_face()
    # profile 2 of 2: a face of its own
    with BuildSketch(Plane(origin=(0, 18, 0), x_dir=(1, 0, 0), z_dir=(0, 1, 0))):
        with BuildLine():
            Line((12.632641842, -14.680794758), (11.922648235, -14.721067505))
            Line((11.922648235, -14.721067505), (11.872680197, -14.796392457))
            add(Edge.make_bspline(
                [(11.872680197, -14.796392457), (11.8694195, -14.804285956), (11.864491576, -14.816215479), (11.846271787, -14.82851828), (11.832603325, -14.810870961), (11.826144402, -14.799362255), (11.821966368, -14.791917707)],
                knots=[0, 0, 0, 0, 1.282902353, 1.938863145, 2.666728425, 4, 4, 4, 4], degree=3))
            Line((11.821966368, -14.791917707), (11.726505043, -14.600249265))
            add(Edge.make_bspline(
                [(11.726505043, -14.600249265), (11.722421253, -14.588930913), (11.715687127, -14.570267068), (11.710784433, -14.54521565), (11.712178398, -14.527547303), (11.71541385, -14.518420775), (11.716809752, -14.514483231)],
                knots=[0, 0, 0, 0, 1.63130738, 2.690008936, 3.434818089, 4, 4, 4, 4], degree=3))
            Line((11.716809752, -14.514483231), (11.757082499, -14.50478794))
            Line((11.757082499, -14.50478794), (11.812271077, -14.474210484))
            Line((11.812271077, -14.474210484), (12.663219298, -12.420300405))
            Line((12.663219298, -12.420300405), (12.773596456, -12.420300405))
            Line((12.773596456, -12.420300405), (12.773596456, -14.494346857))
            add(Edge.make_bspline(
                [(12.773596456, -14.494346857), (12.783968002, -14.49442549), (12.801603574, -14.494559195), (12.817685995, -14.487541945), (12.824310285, -14.484651566)],
                knots=[0, 0, 0, 0, 1.176207474, 2, 2, 2, 2], degree=3))
            Line((12.824310285, -14.484651566), (12.899635237, -14.454074111))
            add(Edge.make_bspline(
                [(12.899635237, -14.454074111), (12.909372882, -14.45043977), (12.926729924, -14.443961672), (12.949079362, -14.434232754), (12.964900623, -14.426741929), (12.972272578, -14.421084462), (12.974960189, -14.419021905)],
                knots=[0, 0, 0, 0, 1.495147538, 2.665053038, 3.513315187, 4, 4, 4, 4], degree=3))
            Line((12.974960189, -14.419021905), (13.010012394, -14.389190241))
            Line((13.010012394, -14.389190241), (13.150967008, -14.534619604))
            add(Edge.make_bspline(
                [(13.150967008, -14.534619604), (13.158147754, -14.543261129), (13.169902345, -14.557406954), (13.175032726, -14.581345927), (13.170140153, -14.59753514), (13.16099412, -14.609193669), (13.145051649, -14.61408062), (13.133316768, -14.61476132), (13.126355885, -14.615165097)],
                knots=[0, 0, 0, 0, 1.690587597, 2.767423091, 3.557953073, 4.202677464, 4.933866242, 6, 6, 6, 6], degree=3))
            Line((13.126355885, -14.615165097), (12.773596456, -14.655437844))
            Line((12.773596456, -14.655437844), (12.773596456, -15.557099894))
            add(Edge.make_bspline(
                [(12.773596456, -15.557099894), (12.773578503, -15.559834814), (12.773518084, -15.569038872), (12.77467652, -15.588414589), (12.77514626, -15.619244646), (12.775750734, -15.657554868), (12.776785958, -15.695996276), (12.77645149, -15.727131786), (12.77443333, -15.746766153), (12.769686653, -15.759384491), (12.760395185, -15.761643892), (12.755626049, -15.759456885), (12.753460082, -15.758463627)],
                knots=[0, 0, 0, 0, 0.375701713, 1.264380521, 2.665139726, 4.612257271, 6.525225464, 7.960129458, 8.858599367, 9.286556546, 9.675980055, 10, 10, 10, 10], degree=3))
            add(Edge.make_bspline(
                [(12.753460082, -15.758463627), (12.749249226, -15.755960749), (12.736555449, -15.748415734), (12.725430289, -15.724067152), (12.712062685, -15.69879476), (12.706053313, -15.680496526), (12.703492045, -15.672697592)],
                knots=[0, 0, 0, 0, 0.572299195, 1.725216547, 3.030459198, 4, 4, 4, 4], degree=3))
            Line((12.703492045, -15.672697592), (12.657998757, -15.581711017))
            Line((12.657998757, -15.581711017), (12.632641842, -15.511606606))
            add(Edge.make_bspline(
                [(12.632641842, -15.511606606), (12.628785774, -15.503205626), (12.621808143, -15.488003888), (12.614164578, -15.467049314), (12.607340053, -15.451579242), (12.603541019, -15.433174575), (12.6079974, -15.404423208), (12.617819006, -15.364159555), (12.629614236, -15.321116662), (12.635156078, -15.28178508), (12.63743117, -15.247878072), (12.637716587, -15.22597172), (12.637862384, -15.214781547)],
                knots=[0, 0, 0, 0, 0.908031708, 1.643101311, 2.192199313, 2.565975908, 3.473020803, 5.002279505, 6.661670863, 7.846934984, 8.900174221, 10, 10, 10, 10], degree=3))
            Line((12.637862384, -15.214781547), (12.632641842, -14.680794758))
        make_face()
        Polygon((12.637862384, -14.514483231), (12.637862384, -12.843164245), (11.927868776, -14.550281228), align=None, mode=Mode.SUBTRACT)
    extrude(amount=-CUT_EXTRUDE_6_DEPTH, mode=Mode.SUBTRACT)


solid = part.part
